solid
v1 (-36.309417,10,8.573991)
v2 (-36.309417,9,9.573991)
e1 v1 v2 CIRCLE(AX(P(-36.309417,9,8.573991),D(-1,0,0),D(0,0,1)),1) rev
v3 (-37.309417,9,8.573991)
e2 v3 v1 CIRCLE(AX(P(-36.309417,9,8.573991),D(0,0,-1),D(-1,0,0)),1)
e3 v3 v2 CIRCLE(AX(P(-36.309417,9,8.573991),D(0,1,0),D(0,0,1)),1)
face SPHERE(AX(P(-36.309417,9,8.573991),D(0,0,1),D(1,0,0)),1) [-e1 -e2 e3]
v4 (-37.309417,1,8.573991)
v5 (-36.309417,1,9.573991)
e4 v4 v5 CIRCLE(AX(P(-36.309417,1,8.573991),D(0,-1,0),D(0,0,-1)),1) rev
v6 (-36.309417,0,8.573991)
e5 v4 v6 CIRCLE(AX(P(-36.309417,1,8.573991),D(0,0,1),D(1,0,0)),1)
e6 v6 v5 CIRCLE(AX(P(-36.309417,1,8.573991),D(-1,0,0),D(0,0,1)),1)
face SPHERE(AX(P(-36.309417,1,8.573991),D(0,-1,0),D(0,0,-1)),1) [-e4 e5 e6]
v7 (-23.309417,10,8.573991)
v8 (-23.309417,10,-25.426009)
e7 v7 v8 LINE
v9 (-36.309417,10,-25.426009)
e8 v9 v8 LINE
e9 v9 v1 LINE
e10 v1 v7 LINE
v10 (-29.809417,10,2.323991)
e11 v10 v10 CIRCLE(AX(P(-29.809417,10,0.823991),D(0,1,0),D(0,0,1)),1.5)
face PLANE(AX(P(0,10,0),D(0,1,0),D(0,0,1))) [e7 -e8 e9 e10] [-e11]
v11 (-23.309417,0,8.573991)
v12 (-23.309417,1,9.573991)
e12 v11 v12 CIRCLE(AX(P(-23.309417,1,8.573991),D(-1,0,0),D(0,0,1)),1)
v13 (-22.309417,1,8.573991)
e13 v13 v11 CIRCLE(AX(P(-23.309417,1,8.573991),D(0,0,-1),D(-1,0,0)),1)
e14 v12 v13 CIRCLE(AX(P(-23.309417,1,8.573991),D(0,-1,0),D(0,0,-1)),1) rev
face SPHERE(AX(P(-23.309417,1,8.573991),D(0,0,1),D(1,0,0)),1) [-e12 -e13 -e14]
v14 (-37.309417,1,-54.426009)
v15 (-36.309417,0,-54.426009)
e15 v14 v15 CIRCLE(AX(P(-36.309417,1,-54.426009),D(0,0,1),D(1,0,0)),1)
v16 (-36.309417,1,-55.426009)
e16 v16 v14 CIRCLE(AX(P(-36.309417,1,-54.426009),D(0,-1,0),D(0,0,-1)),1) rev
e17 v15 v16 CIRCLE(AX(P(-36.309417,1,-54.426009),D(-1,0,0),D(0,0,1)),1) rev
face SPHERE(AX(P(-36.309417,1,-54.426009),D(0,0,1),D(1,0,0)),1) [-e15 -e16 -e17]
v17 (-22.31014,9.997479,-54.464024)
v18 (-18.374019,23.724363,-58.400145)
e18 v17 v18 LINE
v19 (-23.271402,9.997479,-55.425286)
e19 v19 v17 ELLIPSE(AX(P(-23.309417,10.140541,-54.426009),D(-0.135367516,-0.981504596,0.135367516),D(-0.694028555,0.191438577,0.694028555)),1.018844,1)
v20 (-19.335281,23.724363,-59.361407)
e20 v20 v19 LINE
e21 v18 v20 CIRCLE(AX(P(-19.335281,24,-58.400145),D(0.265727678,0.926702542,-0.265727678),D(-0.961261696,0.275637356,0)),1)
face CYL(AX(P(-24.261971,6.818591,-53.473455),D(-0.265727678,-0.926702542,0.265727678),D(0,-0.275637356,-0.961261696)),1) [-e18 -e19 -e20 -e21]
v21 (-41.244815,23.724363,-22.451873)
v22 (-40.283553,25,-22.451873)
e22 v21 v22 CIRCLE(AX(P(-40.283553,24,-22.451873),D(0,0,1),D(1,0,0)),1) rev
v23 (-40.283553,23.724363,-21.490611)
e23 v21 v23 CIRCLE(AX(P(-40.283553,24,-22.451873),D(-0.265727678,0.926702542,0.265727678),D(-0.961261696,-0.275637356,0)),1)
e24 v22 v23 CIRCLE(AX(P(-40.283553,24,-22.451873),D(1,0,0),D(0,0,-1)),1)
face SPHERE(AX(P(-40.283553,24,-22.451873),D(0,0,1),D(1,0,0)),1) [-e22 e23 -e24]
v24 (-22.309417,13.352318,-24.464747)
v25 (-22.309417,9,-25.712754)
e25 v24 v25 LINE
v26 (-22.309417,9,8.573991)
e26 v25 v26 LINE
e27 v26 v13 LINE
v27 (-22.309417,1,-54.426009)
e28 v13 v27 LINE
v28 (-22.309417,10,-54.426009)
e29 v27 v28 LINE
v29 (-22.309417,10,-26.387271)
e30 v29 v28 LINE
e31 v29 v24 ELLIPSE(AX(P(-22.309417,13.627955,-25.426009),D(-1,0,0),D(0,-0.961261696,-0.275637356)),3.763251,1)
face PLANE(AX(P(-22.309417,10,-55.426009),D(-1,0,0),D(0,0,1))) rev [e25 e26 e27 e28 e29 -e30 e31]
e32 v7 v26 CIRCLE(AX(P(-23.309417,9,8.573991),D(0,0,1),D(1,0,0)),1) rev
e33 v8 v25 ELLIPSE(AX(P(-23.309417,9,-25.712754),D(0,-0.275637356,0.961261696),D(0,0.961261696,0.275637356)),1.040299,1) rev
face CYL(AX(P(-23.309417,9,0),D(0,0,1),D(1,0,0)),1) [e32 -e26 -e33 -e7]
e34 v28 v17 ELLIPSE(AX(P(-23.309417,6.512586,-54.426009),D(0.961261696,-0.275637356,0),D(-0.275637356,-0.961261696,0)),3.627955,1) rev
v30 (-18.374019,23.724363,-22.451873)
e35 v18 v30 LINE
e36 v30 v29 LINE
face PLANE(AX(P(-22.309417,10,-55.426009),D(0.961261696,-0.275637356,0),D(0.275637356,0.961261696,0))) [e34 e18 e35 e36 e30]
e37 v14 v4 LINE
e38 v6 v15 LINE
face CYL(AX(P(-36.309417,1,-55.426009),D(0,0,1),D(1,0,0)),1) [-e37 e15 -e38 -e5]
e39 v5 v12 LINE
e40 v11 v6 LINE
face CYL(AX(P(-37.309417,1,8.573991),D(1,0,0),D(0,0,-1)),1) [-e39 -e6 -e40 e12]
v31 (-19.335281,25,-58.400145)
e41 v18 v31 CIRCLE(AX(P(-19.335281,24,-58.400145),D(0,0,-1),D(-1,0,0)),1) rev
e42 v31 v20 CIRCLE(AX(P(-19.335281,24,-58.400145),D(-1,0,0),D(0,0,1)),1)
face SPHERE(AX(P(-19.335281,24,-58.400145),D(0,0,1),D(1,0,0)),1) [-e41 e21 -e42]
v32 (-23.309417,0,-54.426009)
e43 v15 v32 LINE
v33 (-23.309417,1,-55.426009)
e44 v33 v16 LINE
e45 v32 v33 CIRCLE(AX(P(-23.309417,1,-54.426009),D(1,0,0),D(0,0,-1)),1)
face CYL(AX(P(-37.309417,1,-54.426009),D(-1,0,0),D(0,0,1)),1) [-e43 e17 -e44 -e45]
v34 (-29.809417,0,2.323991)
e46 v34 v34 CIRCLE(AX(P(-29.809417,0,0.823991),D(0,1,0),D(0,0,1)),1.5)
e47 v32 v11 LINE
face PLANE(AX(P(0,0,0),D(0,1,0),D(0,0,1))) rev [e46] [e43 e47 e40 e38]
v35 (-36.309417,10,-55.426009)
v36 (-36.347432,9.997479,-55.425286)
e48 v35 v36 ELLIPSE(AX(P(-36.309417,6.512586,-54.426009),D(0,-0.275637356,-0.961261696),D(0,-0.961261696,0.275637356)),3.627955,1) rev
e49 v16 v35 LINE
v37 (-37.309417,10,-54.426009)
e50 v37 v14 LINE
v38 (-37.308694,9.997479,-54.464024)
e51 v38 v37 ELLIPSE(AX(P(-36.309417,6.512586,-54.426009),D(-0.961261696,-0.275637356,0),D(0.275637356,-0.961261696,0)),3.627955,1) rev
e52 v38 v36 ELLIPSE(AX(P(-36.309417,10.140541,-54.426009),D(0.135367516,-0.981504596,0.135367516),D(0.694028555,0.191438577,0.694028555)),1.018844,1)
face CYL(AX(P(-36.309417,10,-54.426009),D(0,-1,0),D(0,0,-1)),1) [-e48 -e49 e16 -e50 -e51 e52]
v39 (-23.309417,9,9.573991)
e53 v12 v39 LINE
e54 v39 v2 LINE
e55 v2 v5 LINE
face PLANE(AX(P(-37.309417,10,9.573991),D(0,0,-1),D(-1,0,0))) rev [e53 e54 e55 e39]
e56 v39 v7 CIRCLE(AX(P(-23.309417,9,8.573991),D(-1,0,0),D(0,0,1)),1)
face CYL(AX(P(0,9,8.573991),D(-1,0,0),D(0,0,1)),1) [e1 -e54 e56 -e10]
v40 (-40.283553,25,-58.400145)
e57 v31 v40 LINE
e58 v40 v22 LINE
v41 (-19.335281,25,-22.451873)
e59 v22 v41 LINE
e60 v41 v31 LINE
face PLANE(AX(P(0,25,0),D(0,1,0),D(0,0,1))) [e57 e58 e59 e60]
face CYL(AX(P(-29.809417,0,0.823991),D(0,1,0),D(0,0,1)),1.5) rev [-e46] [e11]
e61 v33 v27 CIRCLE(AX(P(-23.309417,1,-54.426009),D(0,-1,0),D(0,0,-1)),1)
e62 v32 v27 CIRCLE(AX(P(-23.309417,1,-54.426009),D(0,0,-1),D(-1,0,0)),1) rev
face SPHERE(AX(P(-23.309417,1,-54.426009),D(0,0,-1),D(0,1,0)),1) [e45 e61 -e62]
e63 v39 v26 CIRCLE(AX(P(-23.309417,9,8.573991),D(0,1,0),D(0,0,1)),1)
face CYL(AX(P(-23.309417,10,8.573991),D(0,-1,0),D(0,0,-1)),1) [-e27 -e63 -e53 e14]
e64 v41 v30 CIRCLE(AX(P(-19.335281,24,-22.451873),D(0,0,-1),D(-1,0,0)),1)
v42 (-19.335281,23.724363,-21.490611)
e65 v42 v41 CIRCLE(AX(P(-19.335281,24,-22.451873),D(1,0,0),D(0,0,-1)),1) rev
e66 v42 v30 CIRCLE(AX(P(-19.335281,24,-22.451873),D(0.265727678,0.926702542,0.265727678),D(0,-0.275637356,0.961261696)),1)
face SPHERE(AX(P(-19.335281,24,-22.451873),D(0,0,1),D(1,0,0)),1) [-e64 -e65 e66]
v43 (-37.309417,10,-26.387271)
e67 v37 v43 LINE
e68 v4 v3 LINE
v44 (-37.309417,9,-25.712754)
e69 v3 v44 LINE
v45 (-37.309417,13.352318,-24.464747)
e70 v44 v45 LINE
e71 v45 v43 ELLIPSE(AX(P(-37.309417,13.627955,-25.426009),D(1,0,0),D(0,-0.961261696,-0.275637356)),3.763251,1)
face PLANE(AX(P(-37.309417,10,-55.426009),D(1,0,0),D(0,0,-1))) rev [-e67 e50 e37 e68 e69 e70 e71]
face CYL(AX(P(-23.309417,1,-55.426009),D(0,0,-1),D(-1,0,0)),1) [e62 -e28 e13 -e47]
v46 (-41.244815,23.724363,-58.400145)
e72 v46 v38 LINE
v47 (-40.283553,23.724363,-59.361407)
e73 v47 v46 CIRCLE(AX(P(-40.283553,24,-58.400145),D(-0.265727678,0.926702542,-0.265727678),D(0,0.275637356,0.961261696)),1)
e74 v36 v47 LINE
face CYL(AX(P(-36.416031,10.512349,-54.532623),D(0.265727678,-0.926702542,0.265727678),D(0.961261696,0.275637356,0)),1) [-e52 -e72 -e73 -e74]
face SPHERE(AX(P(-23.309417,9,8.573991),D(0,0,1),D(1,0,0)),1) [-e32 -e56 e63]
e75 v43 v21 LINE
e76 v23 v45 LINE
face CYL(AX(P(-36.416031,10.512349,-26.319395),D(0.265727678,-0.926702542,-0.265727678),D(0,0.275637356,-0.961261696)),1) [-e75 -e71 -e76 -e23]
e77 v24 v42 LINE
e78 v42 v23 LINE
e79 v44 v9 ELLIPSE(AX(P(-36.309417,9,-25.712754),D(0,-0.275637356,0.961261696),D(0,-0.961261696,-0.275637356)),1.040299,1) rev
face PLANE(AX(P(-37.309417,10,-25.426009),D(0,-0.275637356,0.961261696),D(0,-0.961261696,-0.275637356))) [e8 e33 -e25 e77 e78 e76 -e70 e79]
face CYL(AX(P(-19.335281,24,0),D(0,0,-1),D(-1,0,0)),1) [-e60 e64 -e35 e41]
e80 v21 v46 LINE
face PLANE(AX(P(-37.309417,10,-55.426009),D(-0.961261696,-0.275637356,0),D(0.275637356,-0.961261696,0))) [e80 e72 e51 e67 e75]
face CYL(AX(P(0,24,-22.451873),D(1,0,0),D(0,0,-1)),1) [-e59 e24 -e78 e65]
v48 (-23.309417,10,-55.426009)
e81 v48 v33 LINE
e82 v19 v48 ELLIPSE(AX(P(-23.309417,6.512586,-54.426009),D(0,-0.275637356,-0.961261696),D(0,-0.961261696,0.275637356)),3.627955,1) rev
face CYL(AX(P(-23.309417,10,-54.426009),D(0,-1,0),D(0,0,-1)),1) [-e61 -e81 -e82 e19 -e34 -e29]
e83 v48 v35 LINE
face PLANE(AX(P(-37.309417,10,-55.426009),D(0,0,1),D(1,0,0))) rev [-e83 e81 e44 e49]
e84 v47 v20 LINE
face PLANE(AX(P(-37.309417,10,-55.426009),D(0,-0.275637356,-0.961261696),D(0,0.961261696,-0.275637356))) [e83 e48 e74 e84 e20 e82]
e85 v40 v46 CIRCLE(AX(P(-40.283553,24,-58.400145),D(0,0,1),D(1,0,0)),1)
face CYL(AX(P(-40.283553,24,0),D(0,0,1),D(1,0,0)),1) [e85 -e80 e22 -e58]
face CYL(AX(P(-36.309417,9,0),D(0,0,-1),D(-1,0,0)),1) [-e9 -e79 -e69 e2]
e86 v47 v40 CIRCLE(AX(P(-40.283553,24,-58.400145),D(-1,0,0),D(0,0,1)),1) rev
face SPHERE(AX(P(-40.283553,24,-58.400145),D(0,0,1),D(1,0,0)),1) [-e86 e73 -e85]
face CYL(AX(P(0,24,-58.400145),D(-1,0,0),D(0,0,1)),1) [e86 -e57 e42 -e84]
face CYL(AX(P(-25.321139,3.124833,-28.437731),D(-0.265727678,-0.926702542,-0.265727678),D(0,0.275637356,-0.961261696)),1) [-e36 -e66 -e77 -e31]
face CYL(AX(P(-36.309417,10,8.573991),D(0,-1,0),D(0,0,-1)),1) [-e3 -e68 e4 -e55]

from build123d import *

# Parameters (mm, degrees)
SKETCH2_W           = 15
SKETCH2_H           = 65
BOSS_EXTRUDE1_DEPTH = 10
SKETCH3_R           = 1.5
CUT_EXTRUDE1_DEPTH  = 68.557642573
SKETCH4_W           = 15
SKETCH4_H           = 30
BOSS_EXTRUDE2_DEPTH = 15
BOSS_EXTRUDE2_DRAFT = -16
FILLET1_R           = 1
FILLET2_R           = 1
FILLET3_R           = 1
FILLET4_R           = 1


with BuildPart() as part:
    # Sketch2 → Boss-Extrude1 (new body)
    with BuildSketch(Plane(origin=(0, 0, 0), x_dir=(1, 0, 0), z_dir=(0, 1, 0))):
        with Locations((-29.80941704, 22.926008969)):
            Rectangle(SKETCH2_W, SKETCH2_H)
    extrude(amount=BOSS_EXTRUDE1_DEPTH)

    # Sketch3 → Cut-Extrude1 (cut, through all)
    with BuildSketch(Plane(origin=(0, 10, 0), x_dir=(1, 0, 0), z_dir=(0, 1, 0))):
        with Locations(Location((-29.80941704, -0.823991031, 0), (0, 0, 270))):
            Circle(SKETCH3_R)
    extrude(amount=-CUT_EXTRUDE1_DEPTH, mode=Mode.SUBTRACT)


with BuildPart() as boss_extrude2_tool:
    # Sketch4 → Boss-Extrude2 (with draft: the straight prism first)
    with BuildSketch(Plane(origin=(0, 10, 0), x_dir=(1, 0, 0), z_dir=(0, 1, 0))):
        with Locations((-29.80941704, 40.426008969)):
            Rectangle(SKETCH4_W, SKETCH4_H)
    extrude(amount=BOSS_EXTRUDE2_DEPTH)
    # Boss-Extrude2: the draft: its side faces are tilted about the plane it starts from
    boss_extrude2_sides = [boss_extrude2_tool.faces().sort_by_distance(p)[0] for p in [
        (-37.30941704, 17.5, -40.426008969),
        (-29.80941704, 17.5, -25.426008969),
        (-22.30941704, 17.5, -40.426008969),
        (-29.80941704, 17.5, -55.426008969),
    ]]
    draft(boss_extrude2_sides, Plane(origin=(0, 10, 0), x_dir=(1, 0, 0), z_dir=(0, 1, 0)), BOSS_EXTRUDE2_DRAFT)


with BuildPart() as part_1:
    add(part.part)

    # Boss-Extrude2: add boss_extrude2_tool
    add(boss_extrude2_tool.part)

    # Fillet1
    fillet1_edges = [part_1.edges().sort_by_distance(p)[0] for p in [
        (-22.30941704, 10, -7.926008969),
        (-37.30941704, 10, -7.926008969),
        (-41.610597827, 25, -40.426008969),
        (-29.80941704, 25, -21.124828182),
        (-18.008236254, 25, -40.426008969),
        (-29.80941704, 25, -59.727189755),
        (-29.80941704, 10, 9.573991031),
    ]]
    fillet(fillet1_edges, radius=FILLET1_R)

    # Fillet2
    # the kernel refuses this fillet: 1 mm, written as the material it takes off along each edge
    with BuildSketch(Plane(origin=(-23.30941704, 9, 8.573991031), x_dir=(1, 0, 0), z_dir=(0, 0, 1))) as fillet2_piece_1_section:
        Polygon((0, 0), (FILLET2_R, 0), (FILLET2_R, FILLET2_R), (0, FILLET2_R), align=None)
    fillet2_piece_1 = extrude(amount=FILLET2_R, mode=Mode.PRIVATE)
    fillet2_piece_1 = fillet2_piece_1 - Plane(origin=(-23.30941704, 9, 8.573991031), x_dir=(-0.7071067811865475, -0.7071067811865475, 0), z_dir=(0, 0, 1)) * Sphere(FILLET2_R, mode=Mode.PRIVATE)
    add(fillet2_piece_1, mode=Mode.SUBTRACT)
    with BuildSketch(Plane(origin=(-23.30941704, 1, -54.426008969), x_dir=(1, 0, 0), z_dir=(0, -1, 0))) as fillet2_piece_2_section:
        Polygon((0, 0), (FILLET2_R, 0), (FILLET2_R, -FILLET2_R), (0, -FILLET2_R), align=None)
    fillet2_piece_2 = extrude(amount=FILLET2_R, mode=Mode.PRIVATE)
    fillet2_piece_2 = fillet2_piece_2 - Plane(origin=(-23.30941704, 1, -54.426008969), x_dir=(-0.7071067811865475, 0, 0.7071067811865475), z_dir=(0, -1, 0)) * Sphere(FILLET2_R, mode=Mode.PRIVATE)
    add(fillet2_piece_2, mode=Mode.SUBTRACT)
    with BuildSketch(Plane(origin=(-22.30941704, -2.5, 9.573991031), x_dir=(-1, 0, 0), z_dir=(0, 1, 0))) as fillet2_piece_3:
        with BuildLine():
            CenterArc((FILLET2_R, -FILLET2_R), FILLET2_R, 90, 90)
            Line((0, -FILLET2_R), (0, 0))
            Line((0, 0), (FILLET2_R, 0))
        make_face()
    extrude(amount=11.5, mode=Mode.SUBTRACT)
    with BuildSketch(Plane(origin=(-39.80941704, 0, -55.426008969), x_dir=(0, 1, 0), z_dir=(1, 0, 0))) as fillet2_piece_4:
        with BuildLine():
            CenterArc((FILLET2_R, FILLET2_R), FILLET2_R, 180, 90)
            Line((0, FILLET2_R), (0, 0))
            Line((0, 0), (FILLET2_R, 0))
        make_face()
    extrude(amount=16.5, mode=Mode.SUBTRACT)
    with BuildSketch(Plane(origin=(-22.30941704, 0, -54.426008969), x_dir=(-1, 0, 0), z_dir=(0, 0, 1))) as fillet2_piece_5:
        with BuildLine():
            CenterArc((FILLET2_R, -FILLET2_R), FILLET2_R, 90, 90)
            Line((0, -FILLET2_R), (0, 0))
            Line((0, 0), (FILLET2_R, 0))
        make_face()
    extrude(amount=66.5, mode=Mode.SUBTRACT)
    with BuildSketch(Plane(origin=(-37.30941704, -2.5, -55.426008969), x_dir=(0, 0, 1), z_dir=(0, 1, 0))) as fillet2_piece_6_section:
        with BuildLine():
            CenterArc((FILLET2_R, FILLET2_R), FILLET2_R, 180, 90)
            Line((0, FILLET2_R), (0, 0))
            Line((0, 0), (FILLET2_R, 0))
        make_face()
    fillet2_piece_6 = extrude(amount=15, mode=Mode.PRIVATE)
    fillet2_piece_6 = split(fillet2_piece_6, bisect_by=Plane(origin=(-33.997421639, -1.550300601, -55.426008969), z_dir=(-0.9612616959383189, -0.2756373558169994, 0)), keep=Keep.TOP, mode=Mode.PRIVATE)
    fillet2_piece_6 = split(fillet2_piece_6, bisect_by=Plane(origin=(-37.30941704, -1.550300601, -52.114013567), z_dir=(0, -0.2756373558169994, -0.9612616959383189)), keep=Keep.TOP, mode=Mode.PRIVATE)
    add(fillet2_piece_6, mode=Mode.SUBTRACT)
    with BuildSketch(Plane(origin=(-37.30941704, -2.5, -55.426008969), x_dir=(0, 0, 1), z_dir=(0, 1, 0))) as fillet2_piece_7_section:
        with BuildLine():
            CenterArc((FILLET2_R, FILLET2_R), FILLET2_R, 180, 90)
            Line((0, FILLET2_R), (0, 0))
            Line((0, 0), (FILLET2_R, 0))
        make_face()
    fillet2_piece_7 = extrude(amount=15, mode=Mode.PRIVATE)
    fillet2_piece_7 = split(fillet2_piece_7, bisect_by=Plane(origin=(-33.997421639, -1.550300601, -55.426008969), z_dir=(0.9612616959383189, 0.2756373558169994, 0)), keep=Keep.TOP, mode=Mode.PRIVATE)
    fillet2_piece_7 = split(fillet2_piece_7, bisect_by=Plane(origin=(-37.30941704, -1.550300601, -52.114013567), z_dir=(0, -0.2756373558169994, -0.9612616959383189)), keep=Keep.TOP, mode=Mode.PRIVATE)
    add(fillet2_piece_7, mode=Mode.SUBTRACT)
    with BuildSketch(Plane(origin=(-37.30941704, -2.5, -55.426008969), x_dir=(0, 0, 1), z_dir=(0, 1, 0))) as fillet2_piece_8_section:
        with BuildLine():
            CenterArc((FILLET2_R, FILLET2_R), FILLET2_R, 180, 90)
            Line((0, FILLET2_R), (0, 0))
            Line((0, 0), (FILLET2_R, 0))
        make_face()
    fillet2_piece_8 = extrude(amount=15, mode=Mode.PRIVATE)
    fillet2_piece_8 = split(fillet2_piece_8, bisect_by=Plane(origin=(-33.997421639, -1.550300601, -55.426008969), z_dir=(-0.9612616959383189, -0.2756373558169994, 0)), keep=Keep.TOP, mode=Mode.PRIVATE)
    fillet2_piece_8 = split(fillet2_piece_8, bisect_by=Plane(origin=(-37.30941704, -1.550300601, -52.114013567), z_dir=(0, 0.2756373558169994, 0.9612616959383189)), keep=Keep.TOP, mode=Mode.PRIVATE)
    add(fillet2_piece_8, mode=Mode.SUBTRACT)
    with BuildSketch(Plane(origin=(-22.30941704, 1, -55.426008969), x_dir=(-1, 0, 0), z_dir=(0, 1, 0))) as fillet2_piece_9_section:
        with BuildLine():
            CenterArc((FILLET2_R, FILLET2_R), FILLET2_R, 180, 90)
            Line((0, FILLET2_R), (0, 0))
            Line((0, 0), (FILLET2_R, 0))
        make_face()
    fillet2_piece_9 = extrude(amount=11.5, mode=Mode.PRIVATE)
    fillet2_piece_9 = split(fillet2_piece_9, bisect_by=Plane(origin=(-22.30941704, 1.683783567, -53.04137228), z_dir=(0, -0.2756373558169994, -0.9612616959383189)), keep=Keep.TOP, mode=Mode.PRIVATE)
    fillet2_piece_9 = split(fillet2_piece_9, bisect_by=Plane(origin=(-24.694053729, 1.683783567, -55.426008969), z_dir=(0.9612616959383189, -0.2756373558169994, 0)), keep=Keep.TOP, mode=Mode.PRIVATE)
    add(fillet2_piece_9, mode=Mode.SUBTRACT)
    with BuildSketch(Plane(origin=(-22.30941704, 1, -55.426008969), x_dir=(-1, 0, 0), z_dir=(0, 1, 0))) as fillet2_piece_10_section:
        with BuildLine():
            CenterArc((FILLET2_R, FILLET2_R), FILLET2_R, 180, 90)
            Line((0, FILLET2_R), (0, 0))
            Line((0, 0), (FILLET2_R, 0))
        make_face()
    fillet2_piece_10 = extrude(amount=11.5, mode=Mode.PRIVATE)
    fillet2_piece_10 = split(fillet2_piece_10, bisect_by=Plane(origin=(-22.30941704, 1.683783567, -53.04137228), z_dir=(0, 0.2756373558169994, 0.9612616959383189)), keep=Keep.TOP, mode=Mode.PRIVATE)
    fillet2_piece_10 = split(fillet2_piece_10, bisect_by=Plane(origin=(-24.694053729, 1.683783567, -55.426008969), z_dir=(0.9612616959383189, -0.2756373558169994, 0)), keep=Keep.TOP, mode=Mode.PRIVATE)
    add(fillet2_piece_10, mode=Mode.SUBTRACT)
    with BuildSketch(Plane(origin=(-22.30941704, 1, -55.426008969), x_dir=(-1, 0, 0), z_dir=(0, 1, 0))) as fillet2_piece_11_section:
        with BuildLine():
            CenterArc((FILLET2_R, FILLET2_R), FILLET2_R, 180, 90)
            Line((0, FILLET2_R), (0, 0))
            Line((0, 0), (FILLET2_R, 0))
        make_face()
    fillet2_piece_11 = extrude(amount=11.5, mode=Mode.PRIVATE)
    fillet2_piece_11 = split(fillet2_piece_11, bisect_by=Plane(origin=(-22.30941704, 1.683783567, -53.04137228), z_dir=(0, -0.2756373558169994, -0.9612616959383189)), keep=Keep.TOP, mode=Mode.PRIVATE)
    fillet2_piece_11 = split(fillet2_piece_11, bisect_by=Plane(origin=(-24.694053729, 1.683783567, -55.426008969), z_dir=(-0.9612616959383189, 0.2756373558169994, 0)), keep=Keep.TOP, mode=Mode.PRIVATE)
    add(fillet2_piece_11, mode=Mode.SUBTRACT)

    # Fillet3
    # the kernel refuses this fillet: 1 mm, written as the material it takes off along each edge
    with BuildSketch(Plane(origin=(-36.30941704, 9, 8.573991031), x_dir=(-1, 0, 0), z_dir=(0, 0, 1))) as fillet3_piece_1_section:
        Polygon((0, 0), (FILLET3_R, 0), (FILLET3_R, -FILLET3_R), (0, -FILLET3_R), align=None)
    fillet3_piece_1 = extrude(amount=FILLET3_R, mode=Mode.PRIVATE)
    fillet3_piece_1 = fillet3_piece_1 - Plane(origin=(-36.30941704, 9, 8.573991031), x_dir=(0.7071067811865475, -0.7071067811865475, 0), z_dir=(0, 0, 1)) * Sphere(FILLET3_R, mode=Mode.PRIVATE)
    add(fillet3_piece_1, mode=Mode.SUBTRACT)
    with BuildSketch(Plane(origin=(-36.30941704, 1, -54.426008969), x_dir=(-1, 0, 0), z_dir=(0, -1, 0))) as fillet3_piece_2_section:
        Polygon((0, 0), (FILLET3_R, 0), (FILLET3_R, FILLET3_R), (0, FILLET3_R), align=None)
    fillet3_piece_2 = extrude(amount=FILLET3_R, mode=Mode.PRIVATE)
    fillet3_piece_2 = fillet3_piece_2 - Plane(origin=(-36.30941704, 1, -54.426008969), x_dir=(0.7071067811865475, 0, 0.7071067811865475), z_dir=(0, -1, 0)) * Sphere(FILLET3_R, mode=Mode.PRIVATE)
    add(fillet3_piece_2, mode=Mode.SUBTRACT)
    with BuildSketch(Plane(origin=(-23.30941704, 1, 8.573991031), x_dir=(0, 0, 1), z_dir=(0, -1, 0))) as fillet3_piece_3_section:
        Polygon((0, 0), (FILLET3_R, 0), (FILLET3_R, -FILLET3_R), (0, -FILLET3_R), align=None)
    fillet3_piece_3 = extrude(amount=FILLET3_R, mode=Mode.PRIVATE)
    fillet3_piece_3 = fillet3_piece_3 - Plane(origin=(-23.30941704, 1, 8.573991031), x_dir=(-0.7071067811865476, 0, -0.7071067811865475), z_dir=(0, -1, 0)) * Sphere(FILLET3_R, mode=Mode.PRIVATE)
    add(fillet3_piece_3, mode=Mode.SUBTRACT)
    with BuildSketch(Plane(origin=(-36.30941704, 1, 8.573991031), x_dir=(0, 0, 1), z_dir=(-1, 0, 0))) as fillet3_piece_4_section:
        Polygon((0, 0), (FILLET3_R, 0), (FILLET3_R, -FILLET3_R), (0, -FILLET3_R), align=None)
    fillet3_piece_4 = extrude(amount=FILLET3_R, mode=Mode.PRIVATE)
    fillet3_piece_4 = fillet3_piece_4 - Plane(origin=(-36.30941704, 1, 8.573991031), x_dir=(0, 0.7071067811865475, -0.7071067811865475), z_dir=(-1, 0, 0)) * Sphere(FILLET3_R, mode=Mode.PRIVATE)
    add(fillet3_piece_4, mode=Mode.SUBTRACT)
    with BuildSketch(Plane(origin=(-37.30941704, 1, 9.573991031), x_dir=(1, 0, 0), z_dir=(0, 1, 0))) as fillet3_piece_5:
        with BuildLine():
            CenterArc((FILLET3_R, FILLET3_R), FILLET3_R, 180, 90)
            Line((0, FILLET3_R), (0, 0))
            Line((0, 0), (FILLET3_R, 0))
        make_face()
    extrude(amount=8, mode=Mode.SUBTRACT)
    with BuildSketch(Plane(origin=(-23.30941704, 0, 9.573991031), x_dir=(0, 0, -1), z_dir=(-1, 0, 0))) as fillet3_piece_6:
        with BuildLine():
            CenterArc((FILLET3_R, -FILLET3_R), FILLET3_R, 90, 90)
            Line((0, -FILLET3_R), (0, 0))
            Line((0, 0), (FILLET3_R, 0))
        make_face()
    extrude(amount=13, mode=Mode.SUBTRACT)
    with BuildSketch(Plane(origin=(-37.30941704, 0, 8.573991031), x_dir=(1, 0, 0), z_dir=(0, 0, -1))) as fillet3_piece_7:
        with BuildLine():
            CenterArc((FILLET3_R, -FILLET3_R), FILLET3_R, 90, 90)
            Line((0, -FILLET3_R), (0, 0))
            Line((0, 0), (FILLET3_R, 0))
        make_face()
    extrude(amount=63, mode=Mode.SUBTRACT)

    # Fillet4
    # the kernel refuses this fillet: 1 mm, written as the material it takes off along each edge
    with BuildSketch(Plane(origin=(-19.335281076, 24, -58.400144933), x_dir=(-0.586629189217781, 0.7784832277628361, -0.22322647345161653), z_dir=(0.6714721557028178, 0.31344902014780923, -0.6714721557028178))) as fillet4_piece_1_section:
        Polygon((-2.551826428, -2.551826428), (2.551826428, -2.551826428), (2.551826428, 2.551826428), (-2.551826428, 2.551826428), align=None)
    fillet4_piece_1 = extrude(amount=2.551826428, mode=Mode.PRIVATE)
    fillet4_piece_1 = split(fillet4_piece_1, bisect_by=Plane(origin=(-19.335281076, 24, -58.400144933), z_dir=(0.265727678029987, 0.9267025424900824, -0.265727678029987)), keep=Keep.TOP, mode=Mode.PRIVATE)
    fillet4_piece_1 = split(fillet4_piece_1, bisect_by=Plane(origin=(-19.335281076, 24, -58.400144933), z_dir=(0, 0, -1)), keep=Keep.TOP, mode=Mode.PRIVATE)
    fillet4_piece_1 = split(fillet4_piece_1, bisect_by=Plane(origin=(-19.335281076, 24, -58.400144933), z_dir=(1, 0, 0)), keep=Keep.TOP, mode=Mode.PRIVATE)
    fillet4_piece_1 = split(fillet4_piece_1, bisect_by=Plane(origin=(-19.335281076, 23.724362644, -59.361406629), z_dir=(0, 0.2756373558169994, 0.9612616959383189)), keep=Keep.TOP, mode=Mode.PRIVATE)
    fillet4_piece_1 = split(fillet4_piece_1, bisect_by=Plane(origin=(-18.37401938, 23.724362644, -58.400144933), z_dir=(-0.9612616959383189, 0.2756373558169994, 0)), keep=Keep.TOP, mode=Mode.PRIVATE)
    fillet4_piece_1 = split(fillet4_piece_1, bisect_by=Plane(origin=(-19.335281076, 25, -58.400144933), z_dir=(0, -1, 0)), keep=Keep.TOP, mode=Mode.PRIVATE)
    fillet4_piece_1 = fillet4_piece_1 - Plane(origin=(-19.335281076, 24, -58.400144933), x_dir=(-0.6714721557028178, -0.31344902014780923, 0.6714721557028178), z_dir=(-0.586629189217781, 0.7784832277628361, -0.22322647345161653)) * Sphere(FILLET4_R, mode=Mode.PRIVATE)
    add(fillet4_piece_1, mode=Mode.SUBTRACT)
    with BuildSketch(Plane(origin=(-19.335281076, 24, -22.451873004), x_dir=(0.586629189217781, -0.7784832277628361, -0.22322647345161653), z_dir=(0.6714721557028178, 0.31344902014780923, 0.6714721557028178))) as fillet4_piece_2_section:
        Polygon((-2.551826428, -2.551826428), (2.551826428, -2.551826428), (2.551826428, 2.551826428), (-2.551826428, 2.551826428), align=None)
    fillet4_piece_2 = extrude(amount=2.551826428, mode=Mode.PRIVATE)
    fillet4_piece_2 = split(fillet4_piece_2, bisect_by=Plane(origin=(-19.335281076, 24, -22.451873004), z_dir=(0.265727678029987, 0.9267025424900824, 0.265727678029987)), keep=Keep.TOP, mode=Mode.PRIVATE)
    fillet4_piece_2 = split(fillet4_piece_2, bisect_by=Plane(origin=(-19.335281076, 24, -22.451873004), z_dir=(0, 0, 1)), keep=Keep.TOP, mode=Mode.PRIVATE)
    fillet4_piece_2 = split(fillet4_piece_2, bisect_by=Plane(origin=(-19.335281076, 24, -22.451873004), z_dir=(1, 0, 0)), keep=Keep.TOP, mode=Mode.PRIVATE)
    fillet4_piece_2 = split(fillet4_piece_2, bisect_by=Plane(origin=(-19.335281076, 23.724362644, -21.490611308), z_dir=(0, 0.2756373558169994, -0.9612616959383189)), keep=Keep.TOP, mode=Mode.PRIVATE)
    fillet4_piece_2 = split(fillet4_piece_2, bisect_by=Plane(origin=(-18.37401938, 23.724362644, -22.451873004), z_dir=(-0.9612616959383189, 0.2756373558169994, 0)), keep=Keep.TOP, mode=Mode.PRIVATE)
    fillet4_piece_2 = split(fillet4_piece_2, bisect_by=Plane(origin=(-19.335281076, 25, -22.451873004), z_dir=(0, -1, 0)), keep=Keep.TOP, mode=Mode.PRIVATE)
    fillet4_piece_2 = fillet4_piece_2 - Plane(origin=(-19.335281076, 24, -22.451873004), x_dir=(-0.6714721557028178, -0.31344902014780923, -0.6714721557028178), z_dir=(0.586629189217781, -0.7784832277628361, -0.22322647345161653)) * Sphere(FILLET4_R, mode=Mode.PRIVATE)
    add(fillet4_piece_2, mode=Mode.SUBTRACT)
    with BuildSketch(Plane(origin=(-40.283553005, 24, -22.451873004), x_dir=(0.22322647345161664, -0.7784832277628361, 0.5866291892177808), z_dir=(-0.6714721557028177, 0.3134490201478092, 0.6714721557028178))) as fillet4_piece_3_section:
        Polygon((-2.551826428, -2.551826428), (2.551826428, -2.551826428), (2.551826428, 2.551826428), (-2.551826428, 2.551826428), align=None)
    fillet4_piece_3 = extrude(amount=2.551826428, mode=Mode.PRIVATE)
    fillet4_piece_3 = split(fillet4_piece_3, bisect_by=Plane(origin=(-40.283553005, 24, -22.451873004), z_dir=(-0.2657276780299869, 0.9267025424900824, 0.265727678029987)), keep=Keep.TOP, mode=Mode.PRIVATE)
    fillet4_piece_3 = split(fillet4_piece_3, bisect_by=Plane(origin=(-40.283553005, 24, -22.451873004), z_dir=(-1, 0, 0)), keep=Keep.TOP, mode=Mode.PRIVATE)
    fillet4_piece_3 = split(fillet4_piece_3, bisect_by=Plane(origin=(-40.283553005, 24, -22.451873004), z_dir=(0, 0, 1)), keep=Keep.TOP, mode=Mode.PRIVATE)
    fillet4_piece_3 = split(fillet4_piece_3, bisect_by=Plane(origin=(-41.244814701, 23.724362644, -22.451873004), z_dir=(0.9612616959383189, 0.2756373558169994, 0)), keep=Keep.TOP, mode=Mode.PRIVATE)
    fillet4_piece_3 = split(fillet4_piece_3, bisect_by=Plane(origin=(-40.283553005, 23.724362644, -21.490611308), z_dir=(0, 0.2756373558169994, -0.9612616959383189)), keep=Keep.TOP, mode=Mode.PRIVATE)
    fillet4_piece_3 = split(fillet4_piece_3, bisect_by=Plane(origin=(-40.283553005, 25, -22.451873004), z_dir=(0, -1, 0)), keep=Keep.TOP, mode=Mode.PRIVATE)
    fillet4_piece_3 = fillet4_piece_3 - Plane(origin=(-40.283553005, 24, -22.451873004), x_dir=(0.6714721557028177, -0.3134490201478092, -0.6714721557028178), z_dir=(0.22322647345161664, -0.7784832277628361, 0.5866291892177808)) * Sphere(FILLET4_R, mode=Mode.PRIVATE)
    add(fillet4_piece_3, mode=Mode.SUBTRACT)
    with BuildSketch(Plane(origin=(-40.283553005, 24, -58.400144933), x_dir=(-0.22322647345161636, 0.778483227762836, 0.586629189217781), z_dir=(-0.6714721557028179, 0.3134490201478093, -0.6714721557028177))) as fillet4_piece_4_section:
        Polygon((-2.551826428, -2.551826428), (2.551826428, -2.551826428), (2.551826428, 2.551826428), (-2.551826428, 2.551826428), align=None)
    fillet4_piece_4 = extrude(amount=2.551826428, mode=Mode.PRIVATE)
    fillet4_piece_4 = split(fillet4_piece_4, bisect_by=Plane(origin=(-40.283553005, 24, -58.400144933), z_dir=(-0.26572767802998704, 0.9267025424900824, -0.265727678029987)), keep=Keep.TOP, mode=Mode.PRIVATE)
    fillet4_piece_4 = split(fillet4_piece_4, bisect_by=Plane(origin=(-40.283553005, 24, -58.400144933), z_dir=(-1, 0, 0)), keep=Keep.TOP, mode=Mode.PRIVATE)
    fillet4_piece_4 = split(fillet4_piece_4, bisect_by=Plane(origin=(-40.283553005, 24, -58.400144933), z_dir=(0, 0, -1)), keep=Keep.TOP, mode=Mode.PRIVATE)
    fillet4_piece_4 = split(fillet4_piece_4, bisect_by=Plane(origin=(-41.244814701, 23.724362644, -58.400144933), z_dir=(0.9612616959383189, 0.2756373558169994, 0)), keep=Keep.TOP, mode=Mode.PRIVATE)
    fillet4_piece_4 = split(fillet4_piece_4, bisect_by=Plane(origin=(-40.283553005, 23.724362644, -59.361406629), z_dir=(0, 0.2756373558169994, 0.9612616959383189)), keep=Keep.TOP, mode=Mode.PRIVATE)
    fillet4_piece_4 = split(fillet4_piece_4, bisect_by=Plane(origin=(-40.283553005, 25, -58.400144933), z_dir=(0, -1, 0)), keep=Keep.TOP, mode=Mode.PRIVATE)
    fillet4_piece_4 = fillet4_piece_4 - Plane(origin=(-40.283553005, 24, -58.400144933), x_dir=(0.6714721557028179, -0.3134490201478093, 0.6714721557028177), z_dir=(-0.22322647345161636, 0.778483227762836, 0.586629189217781)) * Sphere(FILLET4_R, mode=Mode.PRIVATE)
    add(fillet4_piece_4, mode=Mode.SUBTRACT)
    with BuildSketch(Plane(origin=(-18.44189522, 23.487651457, -59.293530789), x_dir=(-0.9640481321639595, 0.25543383844084533, -0.07324447453942981), z_dir=(-0.26572767802993547, -0.9267025424901008, 0.26572767802997477))) as fillet4_piece_5_section:
        with BuildLine():
            CenterArc((FILLET4_R * 0.92670254249, -FILLET4_R), FILLET4_R, 90, 85.64269976)
            Line((-FILLET4_R * 0.0704071078139, -FILLET4_R * 0.924024048078), (0, 0))
            Line((0, 0), (FILLET4_R * 0.92670254249, 0))
        make_face()
    fillet4_piece_5 = extrude(amount=17.973443193, mode=Mode.PRIVATE)
    fillet4_piece_5 = fillet4_piece_5 - Plane(origin=(-23.30941704, 23.487651457, -54.426008969), x_dir=(-1, 0, 0), z_dir=(0, -1, 0)) * Cylinder(1, 40, mode=Mode.PRIVATE)
    add(fillet4_piece_5, mode=Mode.SUBTRACT)
    with BuildSketch(Plane(origin=(-22.925043327, 7.853055994, -26.041635256), x_dir=(-0.9640481321639451, 0.2554338384408567, 0.07324447453957714), z_dir=(0.26572767802998704, 0.9267025424900825, 0.26572767802998704))) as fillet4_piece_6_section:
        with BuildLine():
            CenterArc((FILLET4_R * 0.92670254249, -FILLET4_R), FILLET4_R, 90, 85.64269976)
            Line((-FILLET4_R * 0.070407107814, -FILLET4_R * 0.924024048078), (0, 0))
            Line((0, 0), (FILLET4_R * 0.92670254249, 0))
        make_face()
    fillet4_piece_6 = extrude(amount=16.871212439, mode=Mode.PRIVATE)
    fillet4_piece_6 = split(fillet4_piece_6, bisect_by=Plane(origin=(-22.30941704, 7.853055994, -26.041635256), z_dir=(1, 0, 0)), keep=Keep.TOP, mode=Mode.PRIVATE)
    add(fillet4_piece_6, mode=Mode.SUBTRACT)
    with BuildSketch(Plane(origin=(-36.693790753, 7.853055994, -26.041635256), x_dir=(-0.07324447453957462, 0.25543383844085743, -0.9640481321639451), z_dir=(-0.265727678029987, 0.9267025424900825, 0.26572767802998704))) as fillet4_piece_7_section:
        with BuildLine():
            CenterArc((FILLET4_R * 0.92670254249, -FILLET4_R), FILLET4_R, 90, 85.64269976)
            Line((-FILLET4_R * 0.070407107814, -FILLET4_R * 0.924024048078), (0, 0))
            Line((0, 0), (FILLET4_R * 0.92670254249, 0))
        make_face()
    fillet4_piece_7 = extrude(amount=16.871212439, mode=Mode.PRIVATE)
    fillet4_piece_7 = split(fillet4_piece_7, bisect_by=Plane(origin=(-37.30941704, 7.853055994, -26.041635256), z_dir=(-1, 0, 0)), keep=Keep.TOP, mode=Mode.PRIVATE)
    add(fillet4_piece_7, mode=Mode.SUBTRACT)
    with BuildSketch(Plane(origin=(-41.17693886, 23.487651457, -59.293530789), x_dir=(-0.073244474539126, 0.25543383844094353, 0.9640481321639565), z_dir=(0.2657276780299394, -0.9267025424901079, 0.2657276780299461))) as fillet4_piece_8_section:
        with BuildLine():
            CenterArc((FILLET4_R * 0.926702542491, -FILLET4_R), FILLET4_R, 90, 85.64269976)
            Line((-FILLET4_R * 0.0704071078136, -FILLET4_R * 0.924024048078), (0, 0))
            Line((0, 0), (FILLET4_R * 0.92670254249, 0))
        make_face()
    fillet4_piece_8 = extrude(amount=17.973443193, mode=Mode.PRIVATE)
    fillet4_piece_8 = fillet4_piece_8 - Plane(origin=(-36.30941704, 23.487651457, -54.426008969), x_dir=(0, 0, 1), z_dir=(0, -1, 0)) * Cylinder(1, 40, mode=Mode.PRIVATE)
    add(fillet4_piece_8, mode=Mode.SUBTRACT)


solid = part_1.part
